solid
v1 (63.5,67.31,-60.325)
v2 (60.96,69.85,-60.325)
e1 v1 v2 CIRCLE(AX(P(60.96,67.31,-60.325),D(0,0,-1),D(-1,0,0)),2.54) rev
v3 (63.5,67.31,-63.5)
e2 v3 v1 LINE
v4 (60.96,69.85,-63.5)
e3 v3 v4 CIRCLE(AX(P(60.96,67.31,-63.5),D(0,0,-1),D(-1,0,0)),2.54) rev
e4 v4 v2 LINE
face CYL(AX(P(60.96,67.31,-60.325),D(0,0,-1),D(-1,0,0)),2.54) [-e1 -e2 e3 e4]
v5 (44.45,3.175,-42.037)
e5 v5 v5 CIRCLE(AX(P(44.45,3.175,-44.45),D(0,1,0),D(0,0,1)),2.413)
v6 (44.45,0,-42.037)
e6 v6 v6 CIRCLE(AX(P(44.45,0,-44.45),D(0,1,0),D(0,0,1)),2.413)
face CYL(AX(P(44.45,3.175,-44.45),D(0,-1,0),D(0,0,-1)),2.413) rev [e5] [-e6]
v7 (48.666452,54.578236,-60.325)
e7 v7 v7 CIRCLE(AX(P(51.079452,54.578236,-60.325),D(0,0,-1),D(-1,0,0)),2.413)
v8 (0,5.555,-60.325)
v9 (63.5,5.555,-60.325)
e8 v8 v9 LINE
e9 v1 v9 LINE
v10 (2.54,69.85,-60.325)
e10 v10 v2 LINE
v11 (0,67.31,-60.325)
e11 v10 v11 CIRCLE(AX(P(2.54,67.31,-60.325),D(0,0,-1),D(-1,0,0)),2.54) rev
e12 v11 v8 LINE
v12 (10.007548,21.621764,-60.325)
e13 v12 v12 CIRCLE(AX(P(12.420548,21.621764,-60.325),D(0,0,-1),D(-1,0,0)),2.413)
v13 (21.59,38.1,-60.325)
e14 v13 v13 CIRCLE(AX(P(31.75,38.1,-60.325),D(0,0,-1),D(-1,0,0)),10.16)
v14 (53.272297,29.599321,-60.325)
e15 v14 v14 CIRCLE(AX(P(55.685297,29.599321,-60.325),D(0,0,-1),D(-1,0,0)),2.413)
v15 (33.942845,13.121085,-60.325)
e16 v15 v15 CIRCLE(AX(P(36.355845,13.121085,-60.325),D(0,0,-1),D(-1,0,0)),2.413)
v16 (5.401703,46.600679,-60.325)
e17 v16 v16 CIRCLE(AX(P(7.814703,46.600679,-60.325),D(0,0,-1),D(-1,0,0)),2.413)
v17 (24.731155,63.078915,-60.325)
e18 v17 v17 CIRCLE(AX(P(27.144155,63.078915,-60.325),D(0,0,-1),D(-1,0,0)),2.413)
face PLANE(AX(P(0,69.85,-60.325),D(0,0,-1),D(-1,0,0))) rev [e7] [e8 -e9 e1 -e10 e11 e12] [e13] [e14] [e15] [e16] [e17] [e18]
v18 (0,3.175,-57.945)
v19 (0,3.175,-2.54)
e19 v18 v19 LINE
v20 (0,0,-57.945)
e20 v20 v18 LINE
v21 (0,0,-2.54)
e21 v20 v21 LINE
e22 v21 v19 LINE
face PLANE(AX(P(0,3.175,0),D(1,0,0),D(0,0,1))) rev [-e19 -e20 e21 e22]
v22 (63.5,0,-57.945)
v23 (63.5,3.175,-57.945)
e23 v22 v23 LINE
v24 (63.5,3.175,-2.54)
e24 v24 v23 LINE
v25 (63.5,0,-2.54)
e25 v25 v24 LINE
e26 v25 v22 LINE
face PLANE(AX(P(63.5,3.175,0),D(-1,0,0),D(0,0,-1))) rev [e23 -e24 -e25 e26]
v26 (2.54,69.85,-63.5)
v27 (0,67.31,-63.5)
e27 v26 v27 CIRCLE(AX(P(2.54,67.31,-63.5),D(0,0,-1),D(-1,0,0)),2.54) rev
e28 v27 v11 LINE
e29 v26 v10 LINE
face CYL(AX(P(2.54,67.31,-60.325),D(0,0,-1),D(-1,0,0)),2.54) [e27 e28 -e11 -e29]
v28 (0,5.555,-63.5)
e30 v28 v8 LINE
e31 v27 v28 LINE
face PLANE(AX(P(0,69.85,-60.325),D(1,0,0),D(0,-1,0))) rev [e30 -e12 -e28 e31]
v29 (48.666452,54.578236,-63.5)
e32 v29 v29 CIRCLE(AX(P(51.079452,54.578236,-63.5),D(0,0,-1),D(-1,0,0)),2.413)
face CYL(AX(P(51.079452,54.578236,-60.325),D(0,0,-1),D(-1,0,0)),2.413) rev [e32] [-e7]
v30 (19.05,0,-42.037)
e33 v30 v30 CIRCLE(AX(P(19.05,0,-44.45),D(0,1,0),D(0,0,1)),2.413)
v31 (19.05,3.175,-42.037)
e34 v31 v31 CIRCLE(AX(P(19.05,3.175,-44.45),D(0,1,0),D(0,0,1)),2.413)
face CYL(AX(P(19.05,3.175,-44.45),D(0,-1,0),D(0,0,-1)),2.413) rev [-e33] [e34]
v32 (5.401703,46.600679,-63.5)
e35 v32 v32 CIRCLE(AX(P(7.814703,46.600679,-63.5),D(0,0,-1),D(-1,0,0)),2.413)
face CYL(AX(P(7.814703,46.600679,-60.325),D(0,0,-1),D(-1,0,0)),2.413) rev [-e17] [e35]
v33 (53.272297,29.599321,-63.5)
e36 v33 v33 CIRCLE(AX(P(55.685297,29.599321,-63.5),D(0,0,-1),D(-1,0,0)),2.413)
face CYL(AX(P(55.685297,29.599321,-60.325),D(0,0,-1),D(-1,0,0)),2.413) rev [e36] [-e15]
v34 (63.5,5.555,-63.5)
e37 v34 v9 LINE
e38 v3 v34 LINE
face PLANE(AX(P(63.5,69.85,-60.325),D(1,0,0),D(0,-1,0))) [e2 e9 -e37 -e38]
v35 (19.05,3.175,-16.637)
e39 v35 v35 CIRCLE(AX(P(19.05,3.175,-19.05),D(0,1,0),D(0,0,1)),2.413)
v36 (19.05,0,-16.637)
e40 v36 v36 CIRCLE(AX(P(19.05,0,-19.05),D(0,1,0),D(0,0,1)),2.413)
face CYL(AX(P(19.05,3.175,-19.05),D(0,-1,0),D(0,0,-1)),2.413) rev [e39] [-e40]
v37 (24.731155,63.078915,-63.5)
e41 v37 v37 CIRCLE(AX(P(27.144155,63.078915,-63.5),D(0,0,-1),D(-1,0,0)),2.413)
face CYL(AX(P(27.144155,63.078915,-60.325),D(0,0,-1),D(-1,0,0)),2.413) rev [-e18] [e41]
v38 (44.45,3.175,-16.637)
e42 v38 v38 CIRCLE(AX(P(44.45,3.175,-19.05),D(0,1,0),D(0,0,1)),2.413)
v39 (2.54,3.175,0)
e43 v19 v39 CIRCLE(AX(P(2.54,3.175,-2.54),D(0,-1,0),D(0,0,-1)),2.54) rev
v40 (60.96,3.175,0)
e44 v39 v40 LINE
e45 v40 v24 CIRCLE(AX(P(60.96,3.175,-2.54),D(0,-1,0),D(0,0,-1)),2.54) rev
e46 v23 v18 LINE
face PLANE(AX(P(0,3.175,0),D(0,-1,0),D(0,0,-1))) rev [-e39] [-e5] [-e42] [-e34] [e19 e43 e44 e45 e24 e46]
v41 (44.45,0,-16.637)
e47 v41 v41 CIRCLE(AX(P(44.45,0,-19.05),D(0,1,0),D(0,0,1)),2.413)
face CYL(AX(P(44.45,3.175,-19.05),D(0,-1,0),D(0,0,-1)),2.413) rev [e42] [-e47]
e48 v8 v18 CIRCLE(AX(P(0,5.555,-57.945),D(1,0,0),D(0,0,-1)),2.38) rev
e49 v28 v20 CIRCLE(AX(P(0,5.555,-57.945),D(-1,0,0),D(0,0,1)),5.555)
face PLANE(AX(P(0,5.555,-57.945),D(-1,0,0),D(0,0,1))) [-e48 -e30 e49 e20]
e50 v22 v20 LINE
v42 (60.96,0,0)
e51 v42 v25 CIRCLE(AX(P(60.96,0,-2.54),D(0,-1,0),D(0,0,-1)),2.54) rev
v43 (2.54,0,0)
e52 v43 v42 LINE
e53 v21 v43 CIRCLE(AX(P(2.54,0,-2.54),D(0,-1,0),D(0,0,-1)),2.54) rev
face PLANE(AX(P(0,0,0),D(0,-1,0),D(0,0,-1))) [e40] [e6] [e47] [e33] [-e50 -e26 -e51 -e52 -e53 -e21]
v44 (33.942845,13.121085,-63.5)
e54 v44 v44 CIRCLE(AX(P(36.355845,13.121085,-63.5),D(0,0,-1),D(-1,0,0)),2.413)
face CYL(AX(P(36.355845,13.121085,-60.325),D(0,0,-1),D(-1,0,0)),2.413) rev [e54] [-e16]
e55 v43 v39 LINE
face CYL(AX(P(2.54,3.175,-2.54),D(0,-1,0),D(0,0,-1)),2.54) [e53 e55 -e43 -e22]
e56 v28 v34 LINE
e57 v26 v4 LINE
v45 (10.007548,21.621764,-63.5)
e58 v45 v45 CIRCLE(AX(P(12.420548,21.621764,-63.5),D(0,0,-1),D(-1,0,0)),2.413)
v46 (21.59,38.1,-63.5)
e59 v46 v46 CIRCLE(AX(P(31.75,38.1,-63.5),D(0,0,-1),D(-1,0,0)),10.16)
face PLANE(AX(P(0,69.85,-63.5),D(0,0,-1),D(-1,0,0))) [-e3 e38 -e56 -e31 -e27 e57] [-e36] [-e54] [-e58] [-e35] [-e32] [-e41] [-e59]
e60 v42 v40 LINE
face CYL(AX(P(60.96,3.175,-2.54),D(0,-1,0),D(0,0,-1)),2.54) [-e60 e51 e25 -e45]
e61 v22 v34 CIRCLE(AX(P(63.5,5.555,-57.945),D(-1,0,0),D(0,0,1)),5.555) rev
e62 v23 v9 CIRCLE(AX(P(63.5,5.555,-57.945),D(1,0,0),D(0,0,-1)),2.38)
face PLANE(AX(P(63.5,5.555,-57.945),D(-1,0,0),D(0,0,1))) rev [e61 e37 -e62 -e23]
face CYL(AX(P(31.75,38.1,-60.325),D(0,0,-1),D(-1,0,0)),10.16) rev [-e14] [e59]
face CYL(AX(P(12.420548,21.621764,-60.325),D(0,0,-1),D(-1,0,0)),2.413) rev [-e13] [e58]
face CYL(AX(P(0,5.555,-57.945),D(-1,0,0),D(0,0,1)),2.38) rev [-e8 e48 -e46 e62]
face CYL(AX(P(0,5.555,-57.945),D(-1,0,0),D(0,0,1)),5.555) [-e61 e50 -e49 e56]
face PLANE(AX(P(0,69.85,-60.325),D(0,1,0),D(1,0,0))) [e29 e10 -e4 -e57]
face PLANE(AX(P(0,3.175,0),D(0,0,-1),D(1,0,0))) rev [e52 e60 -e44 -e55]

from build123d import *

# Parameters (mm, degrees)
SKETCH1_W              = 63.5
SKETCH1_H              = 63.5
SKETCH1_R              = 2.413
BOSS_EXTRUDE1_DEPTH    = 3.175
SKETCH2_W              = 63.5
SKETCH2_H              = 3.175
BOSS_EXTRUDE2_DEPTH    = 66.675
SKETCH3_R              = 10.16
SKETCH3_R_2            = 2.413
CUT_EXTRUDE2_DEPTH     = 60.325
FILLET1_R              = 2.54
CONVERT_SOLID1_DEPTH   = 63.5
CONVERT_SOLID1_2_DEPTH = 63.5


# Read off the part's stored shape, not the designer's step: Convert-Solid1
with BuildPart() as part:
    # Sketch1 → Boss-Extrude1 (new body)
    with BuildSketch(Plane(origin=(0, 0, 0), x_dir=(1, 0, 0), z_dir=(0, 1, 0))):
        with Locations((31.75, 31.75)):
            Rectangle(SKETCH1_W, SKETCH1_H)
        with Locations(Location((19.05, 44.45, 0), (0, 0, 270))):
            Circle(SKETCH1_R, mode=Mode.SUBTRACT)
        with Locations(Location((44.45, 44.45, 0), (0, 0, 270))):
            Circle(SKETCH1_R, mode=Mode.SUBTRACT)
        with Locations(Location((19.05, 19.05, 0), (0, 0, 270))):
            Circle(SKETCH1_R, mode=Mode.SUBTRACT)
        with Locations(Location((44.45, 19.05, 0), (0, 0, 270))):
            Circle(SKETCH1_R, mode=Mode.SUBTRACT)
    extrude(amount=BOSS_EXTRUDE1_DEPTH)

    # Sketch2 → Boss-Extrude2 (add)
    with BuildSketch(Plane(origin=(0, 3.175, 0), x_dir=(1, 0, 0), z_dir=(0, 1, 0))):
        with Locations((31.75, 61.9125)):
            Rectangle(SKETCH2_W, SKETCH2_H)
    extrude(amount=BOSS_EXTRUDE2_DEPTH)

    # Sketch3 → Cut-Extrude2 (cut)
    with BuildSketch(Plane(origin=(0, 0, -63.5), x_dir=(-1, 0, 0), z_dir=(0, 0, -1))):
        with Locations((-31.75, 38.1)):
            Circle(SKETCH3_R)
        with Locations((-27.144154857, 63.078914919)):
            Circle(SKETCH3_R_2)
        with Locations((-7.81470255, 46.600678559)):
            Circle(SKETCH3_R_2)
        with Locations((-12.420547693, 21.621763641)):
            Circle(SKETCH3_R_2)
        with Locations((-36.355845143, 13.121085081)):
            Circle(SKETCH3_R_2)
        with Locations((-55.68529745, 29.599321441)):
            Circle(SKETCH3_R_2)
        with Locations((-51.079452307, 54.578236359)):
            Circle(SKETCH3_R_2)
    extrude(amount=-CUT_EXTRUDE2_DEPTH, mode=Mode.SUBTRACT)

    # Fillet1
    fillet1_edges = [part.edges().sort_by_distance(p)[0] for p in [
        (0, 69.85, -61.9125),
        (63.5, 69.85, -61.9125),
        (63.5, 1.5875, 0),
        (0, 1.5875, 0),
    ]]
    fillet(fillet1_edges, radius=FILLET1_R)

    # Convert-Solid1 outline → Convert-Solid1 (cut)
    with BuildSketch(Plane.YZ):
        with BuildLine():
            Line((0, -63.5), (5.555000066, -63.5))
            ThreePointArc((5.555000066, -63.5), (1.62702185, -61.87297815), (0, -57.944999934))
            Line((0, -57.944999934), (0, -63.5))
        make_face()
    extrude(amount=CONVERT_SOLID1_DEPTH, mode=Mode.SUBTRACT)

    # Convert-Solid1 2 outline → Convert-Solid1 2 (add)
    with BuildSketch(Plane.YZ):
        with BuildLine():
            Line((3.175, -60.325), (5.555000066, -60.325))
            ThreePointArc((5.555000066, -60.325), (3.87208588, -59.62791412), (3.175, -57.944999934))
            Line((3.175, -57.944999934), (3.175, -60.325))
        make_face()
    extrude(amount=CONVERT_SOLID1_2_DEPTH)


solid = part.part
